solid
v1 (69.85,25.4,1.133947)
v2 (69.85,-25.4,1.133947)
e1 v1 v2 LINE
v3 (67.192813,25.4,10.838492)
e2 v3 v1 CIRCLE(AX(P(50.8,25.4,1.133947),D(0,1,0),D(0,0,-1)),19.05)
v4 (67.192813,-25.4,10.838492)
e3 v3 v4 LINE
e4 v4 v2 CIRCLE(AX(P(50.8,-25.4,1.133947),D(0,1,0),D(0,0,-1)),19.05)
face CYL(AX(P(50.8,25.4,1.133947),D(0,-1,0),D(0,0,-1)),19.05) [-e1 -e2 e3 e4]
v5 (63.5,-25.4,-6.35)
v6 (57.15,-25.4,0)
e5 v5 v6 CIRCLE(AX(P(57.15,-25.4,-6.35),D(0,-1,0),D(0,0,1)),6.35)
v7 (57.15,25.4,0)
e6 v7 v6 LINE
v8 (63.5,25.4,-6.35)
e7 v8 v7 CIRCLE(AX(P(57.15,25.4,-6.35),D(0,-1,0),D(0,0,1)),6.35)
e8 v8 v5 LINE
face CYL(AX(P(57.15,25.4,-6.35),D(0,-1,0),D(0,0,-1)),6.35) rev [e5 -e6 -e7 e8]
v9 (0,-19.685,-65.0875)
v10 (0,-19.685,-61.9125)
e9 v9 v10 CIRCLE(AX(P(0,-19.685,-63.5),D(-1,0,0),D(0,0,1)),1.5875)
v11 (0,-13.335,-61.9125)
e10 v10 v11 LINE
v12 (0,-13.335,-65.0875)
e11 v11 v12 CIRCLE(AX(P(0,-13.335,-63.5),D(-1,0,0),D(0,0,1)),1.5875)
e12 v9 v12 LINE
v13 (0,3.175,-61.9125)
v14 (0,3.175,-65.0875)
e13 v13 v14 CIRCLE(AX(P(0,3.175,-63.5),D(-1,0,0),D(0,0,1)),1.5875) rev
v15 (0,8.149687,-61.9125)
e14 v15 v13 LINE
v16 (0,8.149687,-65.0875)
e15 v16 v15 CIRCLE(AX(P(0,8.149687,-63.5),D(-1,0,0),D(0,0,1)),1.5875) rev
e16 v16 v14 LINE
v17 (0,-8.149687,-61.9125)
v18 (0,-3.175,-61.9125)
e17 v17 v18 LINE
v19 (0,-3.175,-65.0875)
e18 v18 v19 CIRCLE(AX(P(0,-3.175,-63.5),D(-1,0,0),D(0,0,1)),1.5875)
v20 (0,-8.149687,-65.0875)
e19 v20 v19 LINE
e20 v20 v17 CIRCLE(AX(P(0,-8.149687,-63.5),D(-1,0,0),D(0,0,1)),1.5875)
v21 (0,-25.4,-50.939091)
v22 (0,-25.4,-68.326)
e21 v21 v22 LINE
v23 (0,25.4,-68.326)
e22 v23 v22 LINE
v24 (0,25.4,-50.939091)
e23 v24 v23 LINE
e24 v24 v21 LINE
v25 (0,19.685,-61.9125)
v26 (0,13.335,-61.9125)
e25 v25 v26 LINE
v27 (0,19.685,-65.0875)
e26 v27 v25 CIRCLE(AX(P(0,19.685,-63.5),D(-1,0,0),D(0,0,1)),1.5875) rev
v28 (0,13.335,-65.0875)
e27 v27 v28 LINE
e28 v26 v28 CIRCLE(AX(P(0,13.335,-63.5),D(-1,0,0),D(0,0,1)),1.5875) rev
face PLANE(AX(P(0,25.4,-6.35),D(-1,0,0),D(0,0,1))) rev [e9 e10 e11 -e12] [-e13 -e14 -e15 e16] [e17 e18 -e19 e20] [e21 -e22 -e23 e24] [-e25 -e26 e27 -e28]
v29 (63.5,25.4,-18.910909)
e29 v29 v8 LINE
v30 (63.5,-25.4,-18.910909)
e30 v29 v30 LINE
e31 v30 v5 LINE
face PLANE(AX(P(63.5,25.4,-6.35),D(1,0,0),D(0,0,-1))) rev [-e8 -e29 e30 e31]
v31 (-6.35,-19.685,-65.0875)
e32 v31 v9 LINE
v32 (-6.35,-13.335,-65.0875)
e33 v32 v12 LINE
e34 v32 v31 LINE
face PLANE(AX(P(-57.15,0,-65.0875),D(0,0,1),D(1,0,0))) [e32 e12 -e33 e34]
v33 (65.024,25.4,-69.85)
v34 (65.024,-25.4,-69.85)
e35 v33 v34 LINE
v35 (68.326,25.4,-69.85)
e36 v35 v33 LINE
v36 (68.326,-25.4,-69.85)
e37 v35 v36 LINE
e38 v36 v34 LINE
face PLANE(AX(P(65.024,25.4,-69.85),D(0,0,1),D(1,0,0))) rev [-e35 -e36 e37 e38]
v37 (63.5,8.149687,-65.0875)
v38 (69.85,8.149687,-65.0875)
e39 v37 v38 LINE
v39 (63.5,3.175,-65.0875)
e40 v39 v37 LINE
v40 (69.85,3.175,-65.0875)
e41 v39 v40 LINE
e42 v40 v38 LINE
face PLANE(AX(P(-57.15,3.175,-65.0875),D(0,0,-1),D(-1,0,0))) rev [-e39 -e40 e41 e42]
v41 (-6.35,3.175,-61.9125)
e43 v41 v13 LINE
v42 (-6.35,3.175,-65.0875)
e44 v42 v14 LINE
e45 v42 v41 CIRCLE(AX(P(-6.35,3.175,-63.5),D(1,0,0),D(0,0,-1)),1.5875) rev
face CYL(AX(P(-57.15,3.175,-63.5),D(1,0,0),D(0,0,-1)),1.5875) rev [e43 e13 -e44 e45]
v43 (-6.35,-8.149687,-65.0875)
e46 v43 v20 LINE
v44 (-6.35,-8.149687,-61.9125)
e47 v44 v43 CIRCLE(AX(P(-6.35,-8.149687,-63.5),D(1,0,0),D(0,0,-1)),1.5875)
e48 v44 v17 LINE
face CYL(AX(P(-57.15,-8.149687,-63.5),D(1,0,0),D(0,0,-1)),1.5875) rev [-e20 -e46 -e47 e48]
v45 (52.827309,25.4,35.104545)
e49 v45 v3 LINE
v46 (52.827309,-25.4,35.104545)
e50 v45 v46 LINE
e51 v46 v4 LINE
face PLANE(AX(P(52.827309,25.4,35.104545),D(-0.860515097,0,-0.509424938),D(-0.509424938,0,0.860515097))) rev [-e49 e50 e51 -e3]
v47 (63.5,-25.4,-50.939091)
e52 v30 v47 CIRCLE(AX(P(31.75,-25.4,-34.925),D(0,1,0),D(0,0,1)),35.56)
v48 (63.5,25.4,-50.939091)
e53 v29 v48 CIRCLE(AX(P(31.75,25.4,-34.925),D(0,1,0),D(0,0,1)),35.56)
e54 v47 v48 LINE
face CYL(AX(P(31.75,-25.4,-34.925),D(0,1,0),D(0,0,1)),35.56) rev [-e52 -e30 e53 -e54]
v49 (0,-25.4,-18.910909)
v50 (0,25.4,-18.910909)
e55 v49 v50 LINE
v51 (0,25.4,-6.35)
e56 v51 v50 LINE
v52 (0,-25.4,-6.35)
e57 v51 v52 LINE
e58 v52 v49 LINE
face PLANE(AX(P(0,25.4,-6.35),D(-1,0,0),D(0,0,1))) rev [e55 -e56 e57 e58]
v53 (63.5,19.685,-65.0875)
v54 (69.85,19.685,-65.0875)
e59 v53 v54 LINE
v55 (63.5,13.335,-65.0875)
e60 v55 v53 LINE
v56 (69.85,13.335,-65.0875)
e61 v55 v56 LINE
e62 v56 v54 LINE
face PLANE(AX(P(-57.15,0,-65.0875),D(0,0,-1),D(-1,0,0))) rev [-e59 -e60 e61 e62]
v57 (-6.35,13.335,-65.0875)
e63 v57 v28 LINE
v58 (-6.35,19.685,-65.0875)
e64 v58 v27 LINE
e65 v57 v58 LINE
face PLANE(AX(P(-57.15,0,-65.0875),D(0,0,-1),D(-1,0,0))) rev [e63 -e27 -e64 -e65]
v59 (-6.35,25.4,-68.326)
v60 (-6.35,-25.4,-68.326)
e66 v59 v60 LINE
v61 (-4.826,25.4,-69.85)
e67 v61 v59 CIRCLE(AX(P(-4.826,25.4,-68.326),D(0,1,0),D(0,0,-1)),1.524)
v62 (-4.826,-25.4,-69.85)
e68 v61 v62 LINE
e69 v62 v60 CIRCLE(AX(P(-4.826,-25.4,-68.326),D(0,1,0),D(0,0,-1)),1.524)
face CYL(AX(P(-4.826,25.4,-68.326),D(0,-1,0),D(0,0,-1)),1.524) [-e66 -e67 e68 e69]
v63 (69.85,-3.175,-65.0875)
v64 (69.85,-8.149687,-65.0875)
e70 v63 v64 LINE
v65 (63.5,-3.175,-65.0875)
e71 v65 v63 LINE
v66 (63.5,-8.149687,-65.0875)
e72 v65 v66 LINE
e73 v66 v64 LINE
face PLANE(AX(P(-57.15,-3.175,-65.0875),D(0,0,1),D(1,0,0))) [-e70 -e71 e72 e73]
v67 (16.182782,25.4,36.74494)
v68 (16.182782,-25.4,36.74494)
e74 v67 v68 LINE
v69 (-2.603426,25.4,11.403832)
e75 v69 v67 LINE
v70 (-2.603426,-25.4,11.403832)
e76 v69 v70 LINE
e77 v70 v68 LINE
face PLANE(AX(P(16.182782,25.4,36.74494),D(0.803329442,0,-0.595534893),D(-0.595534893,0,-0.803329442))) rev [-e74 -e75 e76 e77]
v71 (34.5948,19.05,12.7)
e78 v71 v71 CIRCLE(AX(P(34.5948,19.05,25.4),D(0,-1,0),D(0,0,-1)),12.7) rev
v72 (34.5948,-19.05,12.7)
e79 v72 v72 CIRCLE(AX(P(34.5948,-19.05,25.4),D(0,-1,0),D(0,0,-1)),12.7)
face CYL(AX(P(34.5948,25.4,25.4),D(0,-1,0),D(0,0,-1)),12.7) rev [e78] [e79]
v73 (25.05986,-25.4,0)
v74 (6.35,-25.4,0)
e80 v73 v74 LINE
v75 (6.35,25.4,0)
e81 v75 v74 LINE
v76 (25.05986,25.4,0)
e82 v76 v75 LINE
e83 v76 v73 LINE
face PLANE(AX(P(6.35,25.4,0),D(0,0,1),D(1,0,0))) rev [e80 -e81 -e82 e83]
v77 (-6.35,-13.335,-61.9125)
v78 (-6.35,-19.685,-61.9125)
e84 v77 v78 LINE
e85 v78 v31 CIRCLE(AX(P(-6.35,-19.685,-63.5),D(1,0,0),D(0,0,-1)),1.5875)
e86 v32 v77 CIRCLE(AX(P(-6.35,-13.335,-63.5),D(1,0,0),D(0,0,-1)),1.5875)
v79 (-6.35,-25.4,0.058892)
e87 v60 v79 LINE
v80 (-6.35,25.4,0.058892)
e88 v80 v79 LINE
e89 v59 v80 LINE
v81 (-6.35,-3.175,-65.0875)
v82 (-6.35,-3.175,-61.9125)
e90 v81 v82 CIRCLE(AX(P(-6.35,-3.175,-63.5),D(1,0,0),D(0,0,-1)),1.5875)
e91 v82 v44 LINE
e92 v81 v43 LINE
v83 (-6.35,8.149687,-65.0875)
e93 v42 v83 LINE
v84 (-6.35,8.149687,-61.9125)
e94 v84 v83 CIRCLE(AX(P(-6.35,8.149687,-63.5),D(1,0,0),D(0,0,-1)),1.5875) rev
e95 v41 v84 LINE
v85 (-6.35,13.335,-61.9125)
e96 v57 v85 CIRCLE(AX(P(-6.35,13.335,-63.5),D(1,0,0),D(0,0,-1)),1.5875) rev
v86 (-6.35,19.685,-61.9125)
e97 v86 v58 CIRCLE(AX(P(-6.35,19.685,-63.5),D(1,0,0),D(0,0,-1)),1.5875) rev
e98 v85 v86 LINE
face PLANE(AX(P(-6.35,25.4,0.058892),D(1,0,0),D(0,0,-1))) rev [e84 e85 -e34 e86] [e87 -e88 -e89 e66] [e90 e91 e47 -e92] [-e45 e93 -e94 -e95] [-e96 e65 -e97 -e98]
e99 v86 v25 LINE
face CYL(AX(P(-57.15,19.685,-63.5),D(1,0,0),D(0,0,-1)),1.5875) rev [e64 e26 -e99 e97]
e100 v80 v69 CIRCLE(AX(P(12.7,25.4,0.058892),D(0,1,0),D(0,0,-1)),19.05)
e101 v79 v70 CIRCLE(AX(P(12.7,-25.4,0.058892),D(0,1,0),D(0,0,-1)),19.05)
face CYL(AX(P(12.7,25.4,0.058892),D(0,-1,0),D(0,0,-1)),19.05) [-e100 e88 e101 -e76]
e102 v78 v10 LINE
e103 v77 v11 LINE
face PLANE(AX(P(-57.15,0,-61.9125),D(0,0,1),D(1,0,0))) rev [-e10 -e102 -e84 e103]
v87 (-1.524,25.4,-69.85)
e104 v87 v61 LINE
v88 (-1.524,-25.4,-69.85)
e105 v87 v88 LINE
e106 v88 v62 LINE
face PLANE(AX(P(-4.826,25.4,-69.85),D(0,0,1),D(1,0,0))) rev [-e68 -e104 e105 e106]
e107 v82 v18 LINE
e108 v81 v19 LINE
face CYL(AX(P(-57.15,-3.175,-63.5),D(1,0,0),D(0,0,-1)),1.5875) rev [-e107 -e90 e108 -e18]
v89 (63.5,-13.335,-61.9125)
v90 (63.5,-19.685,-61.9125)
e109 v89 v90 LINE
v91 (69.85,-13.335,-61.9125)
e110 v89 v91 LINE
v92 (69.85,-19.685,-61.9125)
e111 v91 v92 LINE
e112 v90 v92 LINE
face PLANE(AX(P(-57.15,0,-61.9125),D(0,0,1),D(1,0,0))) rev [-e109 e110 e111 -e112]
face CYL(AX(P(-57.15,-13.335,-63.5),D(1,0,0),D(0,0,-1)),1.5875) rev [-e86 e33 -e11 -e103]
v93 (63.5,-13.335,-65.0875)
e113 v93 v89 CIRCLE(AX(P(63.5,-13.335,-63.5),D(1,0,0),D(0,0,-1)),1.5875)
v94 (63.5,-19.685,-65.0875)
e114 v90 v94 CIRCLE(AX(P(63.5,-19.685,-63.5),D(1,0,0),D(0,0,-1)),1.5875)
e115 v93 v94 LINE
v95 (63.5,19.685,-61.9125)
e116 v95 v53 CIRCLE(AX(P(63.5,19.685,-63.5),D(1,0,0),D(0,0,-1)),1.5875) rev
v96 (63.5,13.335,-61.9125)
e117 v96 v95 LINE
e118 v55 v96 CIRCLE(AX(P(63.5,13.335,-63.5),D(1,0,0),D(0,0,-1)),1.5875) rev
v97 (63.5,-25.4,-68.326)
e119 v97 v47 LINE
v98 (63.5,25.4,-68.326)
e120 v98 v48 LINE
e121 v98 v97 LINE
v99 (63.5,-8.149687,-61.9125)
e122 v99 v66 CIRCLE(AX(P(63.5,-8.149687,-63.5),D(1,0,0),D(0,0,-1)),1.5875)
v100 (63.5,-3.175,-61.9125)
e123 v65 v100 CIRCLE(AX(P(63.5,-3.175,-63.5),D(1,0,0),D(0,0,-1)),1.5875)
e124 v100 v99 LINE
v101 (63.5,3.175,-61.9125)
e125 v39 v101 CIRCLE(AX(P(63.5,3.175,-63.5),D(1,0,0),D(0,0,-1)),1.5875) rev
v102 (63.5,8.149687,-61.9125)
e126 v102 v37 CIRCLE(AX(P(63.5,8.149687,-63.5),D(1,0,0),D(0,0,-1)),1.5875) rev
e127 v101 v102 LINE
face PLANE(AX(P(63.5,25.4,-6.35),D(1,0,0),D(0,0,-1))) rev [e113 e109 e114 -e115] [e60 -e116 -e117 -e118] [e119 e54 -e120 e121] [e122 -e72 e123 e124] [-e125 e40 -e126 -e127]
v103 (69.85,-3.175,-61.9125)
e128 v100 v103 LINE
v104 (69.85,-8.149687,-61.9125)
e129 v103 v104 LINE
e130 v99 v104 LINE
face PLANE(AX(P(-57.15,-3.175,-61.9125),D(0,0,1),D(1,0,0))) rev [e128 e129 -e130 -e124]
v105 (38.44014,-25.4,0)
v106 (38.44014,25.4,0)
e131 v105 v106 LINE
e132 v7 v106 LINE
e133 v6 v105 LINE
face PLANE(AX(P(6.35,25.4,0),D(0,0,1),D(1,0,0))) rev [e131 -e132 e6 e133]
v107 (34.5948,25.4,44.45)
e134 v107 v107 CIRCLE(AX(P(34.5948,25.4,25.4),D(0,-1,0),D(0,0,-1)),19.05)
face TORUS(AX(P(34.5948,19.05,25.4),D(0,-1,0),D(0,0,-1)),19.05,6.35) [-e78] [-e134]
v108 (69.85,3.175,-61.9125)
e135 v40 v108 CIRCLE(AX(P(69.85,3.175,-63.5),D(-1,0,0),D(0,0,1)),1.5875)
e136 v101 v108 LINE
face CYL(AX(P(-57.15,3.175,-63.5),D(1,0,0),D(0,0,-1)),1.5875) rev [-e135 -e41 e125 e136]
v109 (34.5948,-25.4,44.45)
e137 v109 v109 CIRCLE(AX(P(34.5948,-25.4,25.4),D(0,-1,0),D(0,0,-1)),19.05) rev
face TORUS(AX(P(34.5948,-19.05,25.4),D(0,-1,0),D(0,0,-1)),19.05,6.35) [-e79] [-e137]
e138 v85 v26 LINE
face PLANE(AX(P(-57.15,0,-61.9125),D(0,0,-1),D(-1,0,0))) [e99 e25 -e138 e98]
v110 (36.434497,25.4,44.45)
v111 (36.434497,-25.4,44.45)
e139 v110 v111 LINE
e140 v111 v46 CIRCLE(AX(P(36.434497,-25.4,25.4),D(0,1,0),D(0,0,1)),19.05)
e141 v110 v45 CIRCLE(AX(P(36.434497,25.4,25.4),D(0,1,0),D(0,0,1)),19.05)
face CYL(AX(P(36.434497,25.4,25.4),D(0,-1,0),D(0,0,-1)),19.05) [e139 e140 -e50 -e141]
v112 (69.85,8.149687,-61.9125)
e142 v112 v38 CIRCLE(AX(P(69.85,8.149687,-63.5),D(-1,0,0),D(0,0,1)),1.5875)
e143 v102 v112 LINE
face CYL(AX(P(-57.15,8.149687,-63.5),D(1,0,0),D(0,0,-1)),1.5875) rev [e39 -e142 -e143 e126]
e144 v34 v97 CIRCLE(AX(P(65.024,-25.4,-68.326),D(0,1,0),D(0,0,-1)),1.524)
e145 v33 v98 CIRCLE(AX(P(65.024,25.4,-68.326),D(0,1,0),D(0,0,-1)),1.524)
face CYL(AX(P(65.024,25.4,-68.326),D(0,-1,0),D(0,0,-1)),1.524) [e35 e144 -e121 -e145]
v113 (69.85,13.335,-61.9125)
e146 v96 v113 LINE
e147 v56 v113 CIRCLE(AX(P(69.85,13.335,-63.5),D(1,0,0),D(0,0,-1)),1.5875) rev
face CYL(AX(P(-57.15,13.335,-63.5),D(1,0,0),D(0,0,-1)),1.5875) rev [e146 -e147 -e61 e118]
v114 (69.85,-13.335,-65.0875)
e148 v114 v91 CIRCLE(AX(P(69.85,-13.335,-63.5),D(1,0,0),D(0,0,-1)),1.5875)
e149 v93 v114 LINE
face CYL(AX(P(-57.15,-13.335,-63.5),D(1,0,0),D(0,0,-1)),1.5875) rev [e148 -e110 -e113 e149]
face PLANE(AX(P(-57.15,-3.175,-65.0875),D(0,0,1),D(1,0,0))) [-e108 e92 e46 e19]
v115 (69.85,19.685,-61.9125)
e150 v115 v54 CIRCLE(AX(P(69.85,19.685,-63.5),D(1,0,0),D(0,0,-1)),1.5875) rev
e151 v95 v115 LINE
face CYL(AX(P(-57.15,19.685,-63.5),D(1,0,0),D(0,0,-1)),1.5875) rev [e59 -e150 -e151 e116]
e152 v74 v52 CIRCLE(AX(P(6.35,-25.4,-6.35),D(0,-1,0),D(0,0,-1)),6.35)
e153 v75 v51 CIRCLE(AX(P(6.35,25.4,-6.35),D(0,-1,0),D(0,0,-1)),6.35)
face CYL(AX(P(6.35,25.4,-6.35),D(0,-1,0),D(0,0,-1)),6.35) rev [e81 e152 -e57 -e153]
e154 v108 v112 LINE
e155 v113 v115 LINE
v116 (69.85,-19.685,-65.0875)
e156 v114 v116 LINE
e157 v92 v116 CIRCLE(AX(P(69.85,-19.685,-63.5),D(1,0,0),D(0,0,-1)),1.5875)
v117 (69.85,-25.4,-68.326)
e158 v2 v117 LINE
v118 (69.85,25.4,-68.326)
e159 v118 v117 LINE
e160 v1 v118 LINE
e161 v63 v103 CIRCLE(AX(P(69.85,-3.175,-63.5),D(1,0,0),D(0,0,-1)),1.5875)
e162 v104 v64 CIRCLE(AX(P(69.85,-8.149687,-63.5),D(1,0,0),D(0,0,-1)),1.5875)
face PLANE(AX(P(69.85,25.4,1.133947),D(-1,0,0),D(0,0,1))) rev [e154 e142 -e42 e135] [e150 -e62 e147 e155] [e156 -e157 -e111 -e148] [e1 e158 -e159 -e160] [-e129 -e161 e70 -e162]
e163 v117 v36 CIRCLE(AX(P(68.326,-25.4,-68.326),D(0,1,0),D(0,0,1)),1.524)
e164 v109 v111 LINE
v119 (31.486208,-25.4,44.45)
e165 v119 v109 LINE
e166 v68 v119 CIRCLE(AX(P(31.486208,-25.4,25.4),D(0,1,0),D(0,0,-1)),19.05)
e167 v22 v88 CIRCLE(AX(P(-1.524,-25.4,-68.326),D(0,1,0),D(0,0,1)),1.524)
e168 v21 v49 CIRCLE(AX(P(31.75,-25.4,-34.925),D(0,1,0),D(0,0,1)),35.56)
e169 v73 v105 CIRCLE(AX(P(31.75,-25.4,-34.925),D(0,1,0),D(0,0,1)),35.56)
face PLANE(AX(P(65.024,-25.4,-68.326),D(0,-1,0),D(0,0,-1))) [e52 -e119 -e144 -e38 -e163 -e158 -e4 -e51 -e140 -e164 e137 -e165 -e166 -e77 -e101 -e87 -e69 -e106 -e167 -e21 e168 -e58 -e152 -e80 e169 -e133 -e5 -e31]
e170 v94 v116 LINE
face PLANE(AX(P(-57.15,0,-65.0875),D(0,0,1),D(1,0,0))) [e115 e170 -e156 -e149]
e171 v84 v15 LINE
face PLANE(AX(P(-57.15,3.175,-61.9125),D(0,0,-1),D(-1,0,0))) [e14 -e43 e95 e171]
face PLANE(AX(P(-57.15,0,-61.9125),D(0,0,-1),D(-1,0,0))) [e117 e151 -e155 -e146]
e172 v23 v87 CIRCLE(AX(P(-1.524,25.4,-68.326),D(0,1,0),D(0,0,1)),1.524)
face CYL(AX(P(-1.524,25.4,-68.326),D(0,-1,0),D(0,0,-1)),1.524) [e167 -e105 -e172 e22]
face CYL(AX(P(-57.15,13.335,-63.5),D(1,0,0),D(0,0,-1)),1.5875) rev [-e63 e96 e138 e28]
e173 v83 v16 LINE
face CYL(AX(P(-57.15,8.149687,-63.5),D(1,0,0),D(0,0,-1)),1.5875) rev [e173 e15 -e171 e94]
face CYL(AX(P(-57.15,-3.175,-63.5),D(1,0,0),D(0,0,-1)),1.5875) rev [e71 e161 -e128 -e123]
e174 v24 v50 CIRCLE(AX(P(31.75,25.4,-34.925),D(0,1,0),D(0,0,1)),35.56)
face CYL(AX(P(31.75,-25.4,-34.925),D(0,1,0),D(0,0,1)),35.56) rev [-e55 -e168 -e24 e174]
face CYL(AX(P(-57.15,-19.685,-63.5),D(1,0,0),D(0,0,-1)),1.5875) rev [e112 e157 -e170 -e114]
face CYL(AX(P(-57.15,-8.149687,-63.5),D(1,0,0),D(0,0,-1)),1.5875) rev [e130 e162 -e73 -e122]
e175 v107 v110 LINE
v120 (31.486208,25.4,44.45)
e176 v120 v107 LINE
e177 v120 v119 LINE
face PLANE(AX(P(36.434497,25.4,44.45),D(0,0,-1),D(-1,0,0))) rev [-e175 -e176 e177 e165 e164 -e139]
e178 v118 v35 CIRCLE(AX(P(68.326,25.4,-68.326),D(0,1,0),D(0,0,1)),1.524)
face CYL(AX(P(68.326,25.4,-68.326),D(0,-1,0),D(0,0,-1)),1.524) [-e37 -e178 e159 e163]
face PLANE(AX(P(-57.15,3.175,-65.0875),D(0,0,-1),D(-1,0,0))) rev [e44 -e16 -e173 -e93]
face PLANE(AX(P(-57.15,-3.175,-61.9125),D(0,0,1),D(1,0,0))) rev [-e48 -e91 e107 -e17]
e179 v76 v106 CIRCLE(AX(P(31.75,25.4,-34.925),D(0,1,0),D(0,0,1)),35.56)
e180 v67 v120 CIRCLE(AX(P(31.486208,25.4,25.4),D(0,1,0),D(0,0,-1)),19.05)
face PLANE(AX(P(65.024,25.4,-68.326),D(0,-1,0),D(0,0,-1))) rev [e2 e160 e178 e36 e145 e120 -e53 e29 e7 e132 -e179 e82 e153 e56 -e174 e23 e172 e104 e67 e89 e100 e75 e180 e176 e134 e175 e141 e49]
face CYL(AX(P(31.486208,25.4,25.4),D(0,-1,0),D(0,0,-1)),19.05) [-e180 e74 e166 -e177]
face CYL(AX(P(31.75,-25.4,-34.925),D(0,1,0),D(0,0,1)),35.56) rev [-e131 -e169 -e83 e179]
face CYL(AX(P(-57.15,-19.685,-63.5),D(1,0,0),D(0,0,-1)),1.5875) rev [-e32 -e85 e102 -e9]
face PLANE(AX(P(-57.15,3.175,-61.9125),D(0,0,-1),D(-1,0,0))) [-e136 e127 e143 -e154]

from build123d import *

# Parameters (mm, degrees)
SKETCH1_R           = 12.7
BOSS_EXTRUDE1_DEPTH = 25.4
SKETCH2_R           = 35.56
CUT_EXTRUDE1_DEPTH  = 50.8
CUT_EXTRUDE2_DEPTH  = 127
FILLET1_R           = 6.35


with BuildPart() as part:
    # Sketch1 → Boss-Extrude1 (new, symmetric)
    with BuildSketch(Plane(origin=(0, 0, 0), x_dir=(1, 0, 0), z_dir=(0, 1, 0))):
        with BuildLine():
            Line((6.35, 0), (57.15, 0))
            ThreePointArc((57.15, 0), (61.640128061, 1.859871939), (63.5, 6.35))
            Line((63.5, 6.35), (63.5, 68.326))
            ThreePointArc((63.5, 68.326), (63.946369265, 69.403630735), (65.024, 69.85))
            Line((65.024, 69.85), (68.326, 69.85))
            ThreePointArc((68.326, 69.85), (69.403630735, 69.403630735), (69.85, 68.326))
            Line((69.85, 68.326), (69.85, -1.133947157))
            ThreePointArc((69.85, -1.133947157), (69.173698323, -6.16482282), (67.192812606, -10.83849222))
            Line((67.192812606, -10.83849222), (52.827309323, -35.104545063))
            ThreePointArc((52.827309323, -35.104545063), (45.869297101, -41.949532976), (36.434496717, -44.45))
            Line((36.434496717, -44.45), (31.486207829, -44.45))
            ThreePointArc((31.486207829, -44.45), (22.919370647, -42.415046303), (16.182781968, -36.744939705))
            Line((16.182781968, -36.744939705), (-2.603425861, -11.403832022))
            ThreePointArc((-2.603425861, -11.403832022), (-5.389123288, -6.032678275), (-6.35, -0.058892317))
            Line((-6.35, -0.058892317), (-6.35, 68.326))
            ThreePointArc((-6.35, 68.326), (-5.903630735, 69.403630735), (-4.826, 69.85))
            Line((-4.826, 69.85), (-1.524, 69.85))
            ThreePointArc((-1.524, 69.85), (-0.446369265, 69.403630735), (0, 68.326))
            Line((0, 68.326), (0, 6.35))
            ThreePointArc((0, 6.35), (1.859871939, 1.859871939), (6.35, 0))
        make_face()
        with Locations(Location((34.5948, -25.4, 0), (0, 0, 270))):
            Circle(SKETCH1_R, mode=Mode.SUBTRACT)
    extrude(amount=BOSS_EXTRUDE1_DEPTH, both=True)

    # Sketch2 → Cut-Extrude1 (cut)
    with BuildSketch(Plane(origin=(0, 25.4, 0), x_dir=(1, 0, 0), z_dir=(0, 1, 0))):
        with Locations((31.75, 34.925)):
            Circle(SKETCH2_R)
    extrude(amount=-CUT_EXTRUDE1_DEPTH, mode=Mode.SUBTRACT)

    # Sketch3 → Cut-Extrude2 (cut)
    with BuildSketch(Plane(origin=(69.85, 0, 0), x_dir=(0, 0, -1), z_dir=(1, 0, 0))):
        with BuildLine():
            Line((65.0875, -3.175), (65.0875, -8.149687283))
            ThreePointArc((65.0875, -8.149687283), (63.5, -9.737187283), (61.9125, -8.149687283))
            Line((61.9125, -8.149687283), (61.9125, -3.175))
            ThreePointArc((61.9125, -3.175), (63.5, -1.5875), (65.0875, -3.175))
        make_face()
        with BuildLine():
            Line((65.0875, -13.335), (65.0875, -19.685))
            ThreePointArc((65.0875, -19.685), (63.5, -21.2725), (61.9125, -19.685))
            Line((61.9125, -19.685), (61.9125, -13.335))
            ThreePointArc((61.9125, -13.335), (63.5, -11.7475), (65.0875, -13.335))
        make_face()
        with BuildLine():
            Line((65.0875, 13.335), (65.0875, 19.685))
            ThreePointArc((65.0875, 19.685), (63.5, 21.2725), (61.9125, 19.685))
            Line((61.9125, 19.685), (61.9125, 13.335))
            ThreePointArc((61.9125, 13.335), (63.5, 11.7475), (65.0875, 13.335))
        make_face()
        with BuildLine():
            Line((65.0875, 3.175), (65.0875, 8.149687283))
            ThreePointArc((65.0875, 8.149687283), (63.5, 9.737187283), (61.9125, 8.149687283))
            Line((61.9125, 8.149687283), (61.9125, 3.175))
            ThreePointArc((61.9125, 3.175), (63.5, 1.5875), (65.0875, 3.175))
        make_face()
    extrude(amount=-CUT_EXTRUDE2_DEPTH, mode=Mode.SUBTRACT)

    # Fillet1
    fillet1_edges = [part.edges().sort_by_distance(p)[0] for p in [
        (34.5948, -25.4, 12.7),
        (34.5948, 25.4, 12.7),
    ]]
    fillet(fillet1_edges, radius=FILLET1_R - 0.0001)  # a hair under: the kernel refuses the full size


solid = part.part
